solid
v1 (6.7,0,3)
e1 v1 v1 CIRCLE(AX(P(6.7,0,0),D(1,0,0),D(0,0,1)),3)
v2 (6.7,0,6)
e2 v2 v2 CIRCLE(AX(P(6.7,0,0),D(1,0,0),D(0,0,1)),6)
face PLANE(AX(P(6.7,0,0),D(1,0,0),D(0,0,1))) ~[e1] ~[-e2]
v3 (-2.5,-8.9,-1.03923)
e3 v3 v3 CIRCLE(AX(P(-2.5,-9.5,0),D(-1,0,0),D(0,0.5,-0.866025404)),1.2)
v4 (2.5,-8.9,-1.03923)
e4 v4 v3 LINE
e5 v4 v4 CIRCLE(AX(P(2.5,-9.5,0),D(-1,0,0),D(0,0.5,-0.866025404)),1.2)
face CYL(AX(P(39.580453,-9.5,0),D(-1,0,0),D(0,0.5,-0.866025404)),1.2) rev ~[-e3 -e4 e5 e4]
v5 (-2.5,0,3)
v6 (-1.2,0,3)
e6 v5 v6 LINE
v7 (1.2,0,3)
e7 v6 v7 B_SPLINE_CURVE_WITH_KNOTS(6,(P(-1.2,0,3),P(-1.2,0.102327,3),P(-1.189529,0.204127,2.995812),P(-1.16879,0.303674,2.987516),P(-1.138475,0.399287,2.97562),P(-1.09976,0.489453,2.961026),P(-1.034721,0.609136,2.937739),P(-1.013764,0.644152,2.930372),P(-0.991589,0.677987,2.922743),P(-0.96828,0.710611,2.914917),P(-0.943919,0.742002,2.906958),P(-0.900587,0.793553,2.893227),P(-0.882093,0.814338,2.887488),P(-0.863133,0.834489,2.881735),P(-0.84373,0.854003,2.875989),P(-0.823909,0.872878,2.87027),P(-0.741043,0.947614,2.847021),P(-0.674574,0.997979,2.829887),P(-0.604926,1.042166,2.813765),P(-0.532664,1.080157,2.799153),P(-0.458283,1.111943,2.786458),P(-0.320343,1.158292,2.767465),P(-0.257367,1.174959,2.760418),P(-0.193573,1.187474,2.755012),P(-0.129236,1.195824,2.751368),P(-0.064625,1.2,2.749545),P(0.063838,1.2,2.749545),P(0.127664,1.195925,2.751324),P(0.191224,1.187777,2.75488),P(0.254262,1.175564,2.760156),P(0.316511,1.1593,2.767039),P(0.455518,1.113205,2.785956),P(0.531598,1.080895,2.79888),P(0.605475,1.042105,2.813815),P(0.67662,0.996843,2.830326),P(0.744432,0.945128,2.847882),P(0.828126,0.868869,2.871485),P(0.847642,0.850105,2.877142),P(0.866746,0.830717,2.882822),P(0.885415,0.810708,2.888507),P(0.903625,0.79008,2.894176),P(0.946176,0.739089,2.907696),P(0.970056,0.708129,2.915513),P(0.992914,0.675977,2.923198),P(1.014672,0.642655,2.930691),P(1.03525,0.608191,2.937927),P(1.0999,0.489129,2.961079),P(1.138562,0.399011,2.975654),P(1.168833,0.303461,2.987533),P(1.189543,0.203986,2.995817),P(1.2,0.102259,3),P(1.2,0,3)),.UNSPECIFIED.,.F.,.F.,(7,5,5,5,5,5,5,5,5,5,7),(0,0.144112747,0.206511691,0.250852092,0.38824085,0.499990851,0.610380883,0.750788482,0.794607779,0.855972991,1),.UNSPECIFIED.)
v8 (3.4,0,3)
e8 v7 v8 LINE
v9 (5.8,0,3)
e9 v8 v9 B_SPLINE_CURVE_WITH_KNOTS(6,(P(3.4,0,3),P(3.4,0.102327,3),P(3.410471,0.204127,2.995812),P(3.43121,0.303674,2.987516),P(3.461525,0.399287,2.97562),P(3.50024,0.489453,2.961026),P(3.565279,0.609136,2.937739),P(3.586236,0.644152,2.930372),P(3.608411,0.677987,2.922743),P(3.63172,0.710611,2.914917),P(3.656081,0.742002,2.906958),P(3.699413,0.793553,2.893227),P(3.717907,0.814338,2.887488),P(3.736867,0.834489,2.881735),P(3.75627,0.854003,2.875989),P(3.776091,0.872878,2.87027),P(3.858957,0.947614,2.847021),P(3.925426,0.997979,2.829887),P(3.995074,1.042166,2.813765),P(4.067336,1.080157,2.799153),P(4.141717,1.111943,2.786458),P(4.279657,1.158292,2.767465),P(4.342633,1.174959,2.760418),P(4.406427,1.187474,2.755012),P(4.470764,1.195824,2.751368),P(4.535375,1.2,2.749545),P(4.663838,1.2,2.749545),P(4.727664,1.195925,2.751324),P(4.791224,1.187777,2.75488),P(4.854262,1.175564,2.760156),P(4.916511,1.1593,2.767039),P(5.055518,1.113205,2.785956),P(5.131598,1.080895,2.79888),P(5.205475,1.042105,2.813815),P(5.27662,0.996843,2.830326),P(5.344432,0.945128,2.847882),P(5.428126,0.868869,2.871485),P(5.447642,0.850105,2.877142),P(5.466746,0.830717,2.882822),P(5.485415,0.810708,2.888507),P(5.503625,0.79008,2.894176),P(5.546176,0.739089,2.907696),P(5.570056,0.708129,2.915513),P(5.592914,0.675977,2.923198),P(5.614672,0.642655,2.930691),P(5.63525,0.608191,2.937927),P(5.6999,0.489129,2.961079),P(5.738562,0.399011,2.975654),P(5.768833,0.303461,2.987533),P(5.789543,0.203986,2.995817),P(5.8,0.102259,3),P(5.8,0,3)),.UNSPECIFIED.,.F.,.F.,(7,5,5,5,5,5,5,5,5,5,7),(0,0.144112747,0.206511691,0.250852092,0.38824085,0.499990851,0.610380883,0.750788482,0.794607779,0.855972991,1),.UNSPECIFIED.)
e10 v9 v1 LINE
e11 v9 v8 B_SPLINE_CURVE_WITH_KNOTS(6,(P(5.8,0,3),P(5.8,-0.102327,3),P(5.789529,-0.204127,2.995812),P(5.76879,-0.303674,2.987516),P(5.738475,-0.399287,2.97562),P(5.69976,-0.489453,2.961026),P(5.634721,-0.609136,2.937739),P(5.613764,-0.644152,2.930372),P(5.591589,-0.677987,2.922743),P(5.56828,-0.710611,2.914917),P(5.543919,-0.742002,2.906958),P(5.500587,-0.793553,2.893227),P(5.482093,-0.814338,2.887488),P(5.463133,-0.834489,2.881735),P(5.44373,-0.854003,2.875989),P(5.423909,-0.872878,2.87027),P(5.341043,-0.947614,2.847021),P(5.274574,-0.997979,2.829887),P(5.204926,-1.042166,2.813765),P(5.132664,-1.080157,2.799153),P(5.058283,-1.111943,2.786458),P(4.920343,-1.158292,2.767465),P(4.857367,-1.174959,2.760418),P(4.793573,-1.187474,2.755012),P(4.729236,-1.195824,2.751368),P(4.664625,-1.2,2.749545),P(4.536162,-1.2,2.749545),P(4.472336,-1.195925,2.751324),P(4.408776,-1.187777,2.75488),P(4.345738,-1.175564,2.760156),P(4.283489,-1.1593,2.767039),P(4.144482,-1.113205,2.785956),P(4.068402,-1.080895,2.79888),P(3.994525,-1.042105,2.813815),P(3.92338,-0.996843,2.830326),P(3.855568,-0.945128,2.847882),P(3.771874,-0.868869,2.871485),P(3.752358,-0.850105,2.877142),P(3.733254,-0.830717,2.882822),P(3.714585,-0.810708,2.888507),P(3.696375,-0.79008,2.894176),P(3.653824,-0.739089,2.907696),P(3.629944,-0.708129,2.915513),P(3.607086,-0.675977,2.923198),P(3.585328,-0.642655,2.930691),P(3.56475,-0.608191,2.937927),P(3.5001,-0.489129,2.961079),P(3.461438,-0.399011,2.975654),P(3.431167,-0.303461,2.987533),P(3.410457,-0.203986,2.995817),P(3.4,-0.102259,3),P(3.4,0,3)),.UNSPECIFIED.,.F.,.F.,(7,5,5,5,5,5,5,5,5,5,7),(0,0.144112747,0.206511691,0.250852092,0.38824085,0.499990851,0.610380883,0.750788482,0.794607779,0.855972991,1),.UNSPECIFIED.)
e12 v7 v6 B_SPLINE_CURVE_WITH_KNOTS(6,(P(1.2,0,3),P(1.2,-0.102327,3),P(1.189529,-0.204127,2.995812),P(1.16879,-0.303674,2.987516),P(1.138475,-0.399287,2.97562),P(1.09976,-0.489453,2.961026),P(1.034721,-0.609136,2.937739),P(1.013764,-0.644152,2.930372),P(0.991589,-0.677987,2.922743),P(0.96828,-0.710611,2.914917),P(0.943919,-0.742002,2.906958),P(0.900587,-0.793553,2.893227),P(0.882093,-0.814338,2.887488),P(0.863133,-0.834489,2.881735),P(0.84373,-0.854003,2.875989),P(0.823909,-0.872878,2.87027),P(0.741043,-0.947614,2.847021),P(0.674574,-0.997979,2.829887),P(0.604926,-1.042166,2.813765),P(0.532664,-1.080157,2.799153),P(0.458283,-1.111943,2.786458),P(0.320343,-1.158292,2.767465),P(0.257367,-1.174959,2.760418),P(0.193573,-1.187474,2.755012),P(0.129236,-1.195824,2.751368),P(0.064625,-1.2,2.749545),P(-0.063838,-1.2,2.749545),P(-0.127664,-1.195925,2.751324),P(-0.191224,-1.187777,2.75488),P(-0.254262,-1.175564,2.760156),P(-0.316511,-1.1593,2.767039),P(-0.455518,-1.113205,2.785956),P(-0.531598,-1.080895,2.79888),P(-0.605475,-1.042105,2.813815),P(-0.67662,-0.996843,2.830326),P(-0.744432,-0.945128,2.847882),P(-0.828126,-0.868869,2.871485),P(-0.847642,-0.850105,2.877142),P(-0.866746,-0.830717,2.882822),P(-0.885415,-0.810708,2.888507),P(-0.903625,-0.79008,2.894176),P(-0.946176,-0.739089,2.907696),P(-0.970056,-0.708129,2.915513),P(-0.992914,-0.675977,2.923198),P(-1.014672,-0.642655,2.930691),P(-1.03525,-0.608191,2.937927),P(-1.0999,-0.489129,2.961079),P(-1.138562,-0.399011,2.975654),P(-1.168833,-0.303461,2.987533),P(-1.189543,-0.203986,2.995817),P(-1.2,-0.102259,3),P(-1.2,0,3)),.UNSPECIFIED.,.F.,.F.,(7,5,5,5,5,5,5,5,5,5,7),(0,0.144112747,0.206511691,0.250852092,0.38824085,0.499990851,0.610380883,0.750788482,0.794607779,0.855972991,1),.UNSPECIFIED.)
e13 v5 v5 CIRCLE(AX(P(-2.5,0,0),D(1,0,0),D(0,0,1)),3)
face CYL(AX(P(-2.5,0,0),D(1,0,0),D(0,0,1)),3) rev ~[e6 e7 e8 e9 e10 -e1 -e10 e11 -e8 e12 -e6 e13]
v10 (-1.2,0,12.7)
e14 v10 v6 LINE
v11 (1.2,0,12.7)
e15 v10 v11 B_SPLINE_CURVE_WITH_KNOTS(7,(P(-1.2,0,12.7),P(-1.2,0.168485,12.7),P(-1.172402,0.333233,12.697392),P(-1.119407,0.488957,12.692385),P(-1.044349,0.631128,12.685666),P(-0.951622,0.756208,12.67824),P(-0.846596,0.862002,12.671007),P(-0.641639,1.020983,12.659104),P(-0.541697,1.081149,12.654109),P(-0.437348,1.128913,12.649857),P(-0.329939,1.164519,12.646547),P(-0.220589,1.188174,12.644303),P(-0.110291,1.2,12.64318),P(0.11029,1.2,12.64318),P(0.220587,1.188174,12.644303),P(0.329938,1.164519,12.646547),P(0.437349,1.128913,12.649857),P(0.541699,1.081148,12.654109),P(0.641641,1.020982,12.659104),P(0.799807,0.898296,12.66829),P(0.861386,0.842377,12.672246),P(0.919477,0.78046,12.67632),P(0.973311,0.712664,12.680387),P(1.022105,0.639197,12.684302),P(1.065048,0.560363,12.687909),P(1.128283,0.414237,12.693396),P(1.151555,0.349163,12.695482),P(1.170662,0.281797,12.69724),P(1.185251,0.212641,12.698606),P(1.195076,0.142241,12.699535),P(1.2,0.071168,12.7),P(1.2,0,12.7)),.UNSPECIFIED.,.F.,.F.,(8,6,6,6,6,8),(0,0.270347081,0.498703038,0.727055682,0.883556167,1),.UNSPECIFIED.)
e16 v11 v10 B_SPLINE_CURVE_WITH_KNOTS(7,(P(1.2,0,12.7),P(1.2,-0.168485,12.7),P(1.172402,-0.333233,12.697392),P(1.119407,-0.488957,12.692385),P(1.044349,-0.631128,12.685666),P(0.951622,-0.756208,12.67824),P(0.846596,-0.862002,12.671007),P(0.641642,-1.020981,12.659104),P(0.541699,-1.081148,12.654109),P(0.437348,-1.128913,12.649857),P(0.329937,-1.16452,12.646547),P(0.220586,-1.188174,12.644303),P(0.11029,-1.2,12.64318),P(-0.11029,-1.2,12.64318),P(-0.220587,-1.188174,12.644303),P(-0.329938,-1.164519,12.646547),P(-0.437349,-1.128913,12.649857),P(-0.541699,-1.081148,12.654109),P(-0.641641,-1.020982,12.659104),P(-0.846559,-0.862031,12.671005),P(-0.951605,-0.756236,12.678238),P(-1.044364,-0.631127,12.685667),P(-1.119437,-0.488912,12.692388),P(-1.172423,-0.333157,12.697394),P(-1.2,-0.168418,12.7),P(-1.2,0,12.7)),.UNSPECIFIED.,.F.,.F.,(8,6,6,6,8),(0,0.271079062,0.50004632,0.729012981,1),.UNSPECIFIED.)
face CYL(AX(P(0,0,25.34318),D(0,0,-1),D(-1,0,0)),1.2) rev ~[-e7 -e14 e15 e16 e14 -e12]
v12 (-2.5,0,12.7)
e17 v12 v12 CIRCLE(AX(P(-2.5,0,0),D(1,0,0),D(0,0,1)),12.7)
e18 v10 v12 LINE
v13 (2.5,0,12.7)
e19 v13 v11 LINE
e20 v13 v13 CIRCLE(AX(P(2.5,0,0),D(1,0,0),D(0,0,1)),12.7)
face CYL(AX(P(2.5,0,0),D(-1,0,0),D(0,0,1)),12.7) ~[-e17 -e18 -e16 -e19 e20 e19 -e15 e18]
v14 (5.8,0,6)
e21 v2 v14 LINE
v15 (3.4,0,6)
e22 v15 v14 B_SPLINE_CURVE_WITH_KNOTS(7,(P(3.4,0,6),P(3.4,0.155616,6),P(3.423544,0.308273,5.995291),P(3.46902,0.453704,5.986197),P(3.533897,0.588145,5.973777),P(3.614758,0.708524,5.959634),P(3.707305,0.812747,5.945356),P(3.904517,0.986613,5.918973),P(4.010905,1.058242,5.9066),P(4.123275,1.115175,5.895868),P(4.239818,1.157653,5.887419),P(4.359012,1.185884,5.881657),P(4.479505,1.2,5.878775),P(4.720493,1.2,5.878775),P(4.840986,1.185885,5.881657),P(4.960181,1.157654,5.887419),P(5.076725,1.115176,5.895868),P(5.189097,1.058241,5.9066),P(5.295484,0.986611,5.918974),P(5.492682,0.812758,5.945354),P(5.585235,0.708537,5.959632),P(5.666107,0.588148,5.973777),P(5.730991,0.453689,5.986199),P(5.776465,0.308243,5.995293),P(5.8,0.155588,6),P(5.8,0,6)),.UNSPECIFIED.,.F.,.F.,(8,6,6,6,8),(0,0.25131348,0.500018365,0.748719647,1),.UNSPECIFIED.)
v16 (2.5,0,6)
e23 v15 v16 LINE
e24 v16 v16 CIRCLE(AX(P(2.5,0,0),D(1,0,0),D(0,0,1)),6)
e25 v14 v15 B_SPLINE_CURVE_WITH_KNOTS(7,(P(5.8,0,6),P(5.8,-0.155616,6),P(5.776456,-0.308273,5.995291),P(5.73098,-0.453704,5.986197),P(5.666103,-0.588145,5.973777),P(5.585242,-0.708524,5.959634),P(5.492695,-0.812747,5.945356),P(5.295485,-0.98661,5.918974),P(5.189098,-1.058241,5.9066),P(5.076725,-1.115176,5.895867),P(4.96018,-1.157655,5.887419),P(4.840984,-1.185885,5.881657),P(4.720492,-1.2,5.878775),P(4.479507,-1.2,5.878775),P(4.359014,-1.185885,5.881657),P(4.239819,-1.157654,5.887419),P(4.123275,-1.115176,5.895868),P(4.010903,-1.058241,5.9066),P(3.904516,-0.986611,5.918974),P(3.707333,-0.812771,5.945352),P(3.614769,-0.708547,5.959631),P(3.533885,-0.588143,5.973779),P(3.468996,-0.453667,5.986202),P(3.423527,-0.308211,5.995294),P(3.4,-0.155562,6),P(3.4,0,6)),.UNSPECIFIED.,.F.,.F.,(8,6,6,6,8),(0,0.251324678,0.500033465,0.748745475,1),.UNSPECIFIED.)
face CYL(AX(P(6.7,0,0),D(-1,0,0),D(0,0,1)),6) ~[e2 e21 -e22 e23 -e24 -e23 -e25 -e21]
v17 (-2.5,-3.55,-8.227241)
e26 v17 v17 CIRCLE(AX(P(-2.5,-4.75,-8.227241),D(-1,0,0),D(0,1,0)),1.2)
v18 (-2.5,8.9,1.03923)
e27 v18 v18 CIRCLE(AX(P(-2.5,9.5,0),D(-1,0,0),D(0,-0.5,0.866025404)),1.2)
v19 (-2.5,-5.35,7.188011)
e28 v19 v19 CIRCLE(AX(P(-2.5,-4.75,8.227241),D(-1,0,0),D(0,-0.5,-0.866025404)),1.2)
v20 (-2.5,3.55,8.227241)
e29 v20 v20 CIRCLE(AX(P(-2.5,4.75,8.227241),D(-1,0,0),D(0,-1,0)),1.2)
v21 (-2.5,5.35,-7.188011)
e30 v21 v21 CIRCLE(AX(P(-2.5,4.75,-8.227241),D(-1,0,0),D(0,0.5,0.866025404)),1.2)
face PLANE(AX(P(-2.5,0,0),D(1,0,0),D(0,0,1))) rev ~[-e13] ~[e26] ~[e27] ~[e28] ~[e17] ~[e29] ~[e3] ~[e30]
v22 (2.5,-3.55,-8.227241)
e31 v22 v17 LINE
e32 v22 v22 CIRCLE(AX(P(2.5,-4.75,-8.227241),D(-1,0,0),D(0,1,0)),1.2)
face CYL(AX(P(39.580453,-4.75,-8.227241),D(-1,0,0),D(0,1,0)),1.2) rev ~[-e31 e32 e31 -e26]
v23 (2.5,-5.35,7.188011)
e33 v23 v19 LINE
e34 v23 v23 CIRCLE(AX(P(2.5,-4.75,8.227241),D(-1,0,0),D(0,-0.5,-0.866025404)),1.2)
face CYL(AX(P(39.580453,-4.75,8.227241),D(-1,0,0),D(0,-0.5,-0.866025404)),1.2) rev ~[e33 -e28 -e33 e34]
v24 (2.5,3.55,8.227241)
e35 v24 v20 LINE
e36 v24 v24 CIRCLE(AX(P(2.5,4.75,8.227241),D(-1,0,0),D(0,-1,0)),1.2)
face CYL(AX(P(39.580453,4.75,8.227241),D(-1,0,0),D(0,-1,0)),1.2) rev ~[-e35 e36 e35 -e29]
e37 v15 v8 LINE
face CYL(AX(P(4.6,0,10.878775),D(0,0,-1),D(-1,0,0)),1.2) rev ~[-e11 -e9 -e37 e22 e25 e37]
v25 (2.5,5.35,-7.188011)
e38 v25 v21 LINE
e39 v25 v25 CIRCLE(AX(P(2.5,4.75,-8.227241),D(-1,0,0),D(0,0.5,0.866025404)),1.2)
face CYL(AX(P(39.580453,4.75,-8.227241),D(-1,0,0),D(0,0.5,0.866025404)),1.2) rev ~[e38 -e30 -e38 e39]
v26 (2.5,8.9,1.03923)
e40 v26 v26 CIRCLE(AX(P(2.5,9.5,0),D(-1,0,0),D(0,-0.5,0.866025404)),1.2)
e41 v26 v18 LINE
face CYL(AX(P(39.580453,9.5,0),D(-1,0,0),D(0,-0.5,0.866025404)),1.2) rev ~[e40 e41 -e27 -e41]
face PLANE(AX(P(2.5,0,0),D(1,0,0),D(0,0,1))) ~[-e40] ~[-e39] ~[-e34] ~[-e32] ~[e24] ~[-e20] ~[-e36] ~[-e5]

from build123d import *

# Parameters (mm, degrees)
F3_D            = 2.4
F3_COPIES_COUNT = 6
F6_D            = 2.4
F6_DEPTH        = 12.7
F6_START        = 0.0568201
F6_TIP          = 0.7210327428
F9_D            = 2.4
F9_DEPTH        = 5
F9_START        = 0.1212247
F9_TIP          = 0.7210327428


# Not quite as in the source:
# - a pattern or mirror of a feature is missing from the dataset's text; its kind, count and spacing are read off the source's solid


with BuildPart() as f1:
    # F0 (on Front) → F1 (revolve)
    with BuildSketch(Plane.XZ):
        Polygon((-2.5, 12.7), (-2.5, 3), (6.7, 3), (6.7, 6), (2.5, 6), (2.5, 12.7), align=None)
    revolve(axis=Axis((2.1, 0, 0), (1, 0, 0)))

    # F3 (through all)
    with Locations(Plane.YZ.offset(2.5)):
        with Locations((4.75, 8.227241336)):
            f3 = Hole(F3_D / 2)

    # F3_copies: F3 ×6 about axis
    f3_copies_axis = Axis((0, 0, 0), (1, 0, 0))
    for i in range(1, F3_COPIES_COUNT):
        add(f3.rotate(f3_copies_axis, i * 360 / F3_COPIES_COUNT), mode=Mode.SUBTRACT)

    # F6
    # its depths count from where the whole tool has entered the part; down to there all is cleared
    with Locations(Plane.XY.offset(12.7).offset(-F6_START)):
        with Locations((0, 0)):
            Hole(F6_D / 2, depth=F6_DEPTH)
            with Locations((0, 0, -(F6_DEPTH + F6_TIP / 2))):  # 118° drill point
                Cone(0, F6_D / 2, F6_TIP, mode=Mode.SUBTRACT)

    # F9
    # its depths count from where the whole tool has entered the part; down to there all is cleared
    with Locations(Plane.XY.offset(6).offset(-F9_START)):
        with Locations((4.6, 0)):
            Hole(F9_D / 2, depth=F9_DEPTH)
            with Locations((0, 0, -(F9_DEPTH + F9_TIP / 2))):  # 118° drill point
                Cone(0, F9_D / 2, F9_TIP, mode=Mode.SUBTRACT)


solid = f1.part
